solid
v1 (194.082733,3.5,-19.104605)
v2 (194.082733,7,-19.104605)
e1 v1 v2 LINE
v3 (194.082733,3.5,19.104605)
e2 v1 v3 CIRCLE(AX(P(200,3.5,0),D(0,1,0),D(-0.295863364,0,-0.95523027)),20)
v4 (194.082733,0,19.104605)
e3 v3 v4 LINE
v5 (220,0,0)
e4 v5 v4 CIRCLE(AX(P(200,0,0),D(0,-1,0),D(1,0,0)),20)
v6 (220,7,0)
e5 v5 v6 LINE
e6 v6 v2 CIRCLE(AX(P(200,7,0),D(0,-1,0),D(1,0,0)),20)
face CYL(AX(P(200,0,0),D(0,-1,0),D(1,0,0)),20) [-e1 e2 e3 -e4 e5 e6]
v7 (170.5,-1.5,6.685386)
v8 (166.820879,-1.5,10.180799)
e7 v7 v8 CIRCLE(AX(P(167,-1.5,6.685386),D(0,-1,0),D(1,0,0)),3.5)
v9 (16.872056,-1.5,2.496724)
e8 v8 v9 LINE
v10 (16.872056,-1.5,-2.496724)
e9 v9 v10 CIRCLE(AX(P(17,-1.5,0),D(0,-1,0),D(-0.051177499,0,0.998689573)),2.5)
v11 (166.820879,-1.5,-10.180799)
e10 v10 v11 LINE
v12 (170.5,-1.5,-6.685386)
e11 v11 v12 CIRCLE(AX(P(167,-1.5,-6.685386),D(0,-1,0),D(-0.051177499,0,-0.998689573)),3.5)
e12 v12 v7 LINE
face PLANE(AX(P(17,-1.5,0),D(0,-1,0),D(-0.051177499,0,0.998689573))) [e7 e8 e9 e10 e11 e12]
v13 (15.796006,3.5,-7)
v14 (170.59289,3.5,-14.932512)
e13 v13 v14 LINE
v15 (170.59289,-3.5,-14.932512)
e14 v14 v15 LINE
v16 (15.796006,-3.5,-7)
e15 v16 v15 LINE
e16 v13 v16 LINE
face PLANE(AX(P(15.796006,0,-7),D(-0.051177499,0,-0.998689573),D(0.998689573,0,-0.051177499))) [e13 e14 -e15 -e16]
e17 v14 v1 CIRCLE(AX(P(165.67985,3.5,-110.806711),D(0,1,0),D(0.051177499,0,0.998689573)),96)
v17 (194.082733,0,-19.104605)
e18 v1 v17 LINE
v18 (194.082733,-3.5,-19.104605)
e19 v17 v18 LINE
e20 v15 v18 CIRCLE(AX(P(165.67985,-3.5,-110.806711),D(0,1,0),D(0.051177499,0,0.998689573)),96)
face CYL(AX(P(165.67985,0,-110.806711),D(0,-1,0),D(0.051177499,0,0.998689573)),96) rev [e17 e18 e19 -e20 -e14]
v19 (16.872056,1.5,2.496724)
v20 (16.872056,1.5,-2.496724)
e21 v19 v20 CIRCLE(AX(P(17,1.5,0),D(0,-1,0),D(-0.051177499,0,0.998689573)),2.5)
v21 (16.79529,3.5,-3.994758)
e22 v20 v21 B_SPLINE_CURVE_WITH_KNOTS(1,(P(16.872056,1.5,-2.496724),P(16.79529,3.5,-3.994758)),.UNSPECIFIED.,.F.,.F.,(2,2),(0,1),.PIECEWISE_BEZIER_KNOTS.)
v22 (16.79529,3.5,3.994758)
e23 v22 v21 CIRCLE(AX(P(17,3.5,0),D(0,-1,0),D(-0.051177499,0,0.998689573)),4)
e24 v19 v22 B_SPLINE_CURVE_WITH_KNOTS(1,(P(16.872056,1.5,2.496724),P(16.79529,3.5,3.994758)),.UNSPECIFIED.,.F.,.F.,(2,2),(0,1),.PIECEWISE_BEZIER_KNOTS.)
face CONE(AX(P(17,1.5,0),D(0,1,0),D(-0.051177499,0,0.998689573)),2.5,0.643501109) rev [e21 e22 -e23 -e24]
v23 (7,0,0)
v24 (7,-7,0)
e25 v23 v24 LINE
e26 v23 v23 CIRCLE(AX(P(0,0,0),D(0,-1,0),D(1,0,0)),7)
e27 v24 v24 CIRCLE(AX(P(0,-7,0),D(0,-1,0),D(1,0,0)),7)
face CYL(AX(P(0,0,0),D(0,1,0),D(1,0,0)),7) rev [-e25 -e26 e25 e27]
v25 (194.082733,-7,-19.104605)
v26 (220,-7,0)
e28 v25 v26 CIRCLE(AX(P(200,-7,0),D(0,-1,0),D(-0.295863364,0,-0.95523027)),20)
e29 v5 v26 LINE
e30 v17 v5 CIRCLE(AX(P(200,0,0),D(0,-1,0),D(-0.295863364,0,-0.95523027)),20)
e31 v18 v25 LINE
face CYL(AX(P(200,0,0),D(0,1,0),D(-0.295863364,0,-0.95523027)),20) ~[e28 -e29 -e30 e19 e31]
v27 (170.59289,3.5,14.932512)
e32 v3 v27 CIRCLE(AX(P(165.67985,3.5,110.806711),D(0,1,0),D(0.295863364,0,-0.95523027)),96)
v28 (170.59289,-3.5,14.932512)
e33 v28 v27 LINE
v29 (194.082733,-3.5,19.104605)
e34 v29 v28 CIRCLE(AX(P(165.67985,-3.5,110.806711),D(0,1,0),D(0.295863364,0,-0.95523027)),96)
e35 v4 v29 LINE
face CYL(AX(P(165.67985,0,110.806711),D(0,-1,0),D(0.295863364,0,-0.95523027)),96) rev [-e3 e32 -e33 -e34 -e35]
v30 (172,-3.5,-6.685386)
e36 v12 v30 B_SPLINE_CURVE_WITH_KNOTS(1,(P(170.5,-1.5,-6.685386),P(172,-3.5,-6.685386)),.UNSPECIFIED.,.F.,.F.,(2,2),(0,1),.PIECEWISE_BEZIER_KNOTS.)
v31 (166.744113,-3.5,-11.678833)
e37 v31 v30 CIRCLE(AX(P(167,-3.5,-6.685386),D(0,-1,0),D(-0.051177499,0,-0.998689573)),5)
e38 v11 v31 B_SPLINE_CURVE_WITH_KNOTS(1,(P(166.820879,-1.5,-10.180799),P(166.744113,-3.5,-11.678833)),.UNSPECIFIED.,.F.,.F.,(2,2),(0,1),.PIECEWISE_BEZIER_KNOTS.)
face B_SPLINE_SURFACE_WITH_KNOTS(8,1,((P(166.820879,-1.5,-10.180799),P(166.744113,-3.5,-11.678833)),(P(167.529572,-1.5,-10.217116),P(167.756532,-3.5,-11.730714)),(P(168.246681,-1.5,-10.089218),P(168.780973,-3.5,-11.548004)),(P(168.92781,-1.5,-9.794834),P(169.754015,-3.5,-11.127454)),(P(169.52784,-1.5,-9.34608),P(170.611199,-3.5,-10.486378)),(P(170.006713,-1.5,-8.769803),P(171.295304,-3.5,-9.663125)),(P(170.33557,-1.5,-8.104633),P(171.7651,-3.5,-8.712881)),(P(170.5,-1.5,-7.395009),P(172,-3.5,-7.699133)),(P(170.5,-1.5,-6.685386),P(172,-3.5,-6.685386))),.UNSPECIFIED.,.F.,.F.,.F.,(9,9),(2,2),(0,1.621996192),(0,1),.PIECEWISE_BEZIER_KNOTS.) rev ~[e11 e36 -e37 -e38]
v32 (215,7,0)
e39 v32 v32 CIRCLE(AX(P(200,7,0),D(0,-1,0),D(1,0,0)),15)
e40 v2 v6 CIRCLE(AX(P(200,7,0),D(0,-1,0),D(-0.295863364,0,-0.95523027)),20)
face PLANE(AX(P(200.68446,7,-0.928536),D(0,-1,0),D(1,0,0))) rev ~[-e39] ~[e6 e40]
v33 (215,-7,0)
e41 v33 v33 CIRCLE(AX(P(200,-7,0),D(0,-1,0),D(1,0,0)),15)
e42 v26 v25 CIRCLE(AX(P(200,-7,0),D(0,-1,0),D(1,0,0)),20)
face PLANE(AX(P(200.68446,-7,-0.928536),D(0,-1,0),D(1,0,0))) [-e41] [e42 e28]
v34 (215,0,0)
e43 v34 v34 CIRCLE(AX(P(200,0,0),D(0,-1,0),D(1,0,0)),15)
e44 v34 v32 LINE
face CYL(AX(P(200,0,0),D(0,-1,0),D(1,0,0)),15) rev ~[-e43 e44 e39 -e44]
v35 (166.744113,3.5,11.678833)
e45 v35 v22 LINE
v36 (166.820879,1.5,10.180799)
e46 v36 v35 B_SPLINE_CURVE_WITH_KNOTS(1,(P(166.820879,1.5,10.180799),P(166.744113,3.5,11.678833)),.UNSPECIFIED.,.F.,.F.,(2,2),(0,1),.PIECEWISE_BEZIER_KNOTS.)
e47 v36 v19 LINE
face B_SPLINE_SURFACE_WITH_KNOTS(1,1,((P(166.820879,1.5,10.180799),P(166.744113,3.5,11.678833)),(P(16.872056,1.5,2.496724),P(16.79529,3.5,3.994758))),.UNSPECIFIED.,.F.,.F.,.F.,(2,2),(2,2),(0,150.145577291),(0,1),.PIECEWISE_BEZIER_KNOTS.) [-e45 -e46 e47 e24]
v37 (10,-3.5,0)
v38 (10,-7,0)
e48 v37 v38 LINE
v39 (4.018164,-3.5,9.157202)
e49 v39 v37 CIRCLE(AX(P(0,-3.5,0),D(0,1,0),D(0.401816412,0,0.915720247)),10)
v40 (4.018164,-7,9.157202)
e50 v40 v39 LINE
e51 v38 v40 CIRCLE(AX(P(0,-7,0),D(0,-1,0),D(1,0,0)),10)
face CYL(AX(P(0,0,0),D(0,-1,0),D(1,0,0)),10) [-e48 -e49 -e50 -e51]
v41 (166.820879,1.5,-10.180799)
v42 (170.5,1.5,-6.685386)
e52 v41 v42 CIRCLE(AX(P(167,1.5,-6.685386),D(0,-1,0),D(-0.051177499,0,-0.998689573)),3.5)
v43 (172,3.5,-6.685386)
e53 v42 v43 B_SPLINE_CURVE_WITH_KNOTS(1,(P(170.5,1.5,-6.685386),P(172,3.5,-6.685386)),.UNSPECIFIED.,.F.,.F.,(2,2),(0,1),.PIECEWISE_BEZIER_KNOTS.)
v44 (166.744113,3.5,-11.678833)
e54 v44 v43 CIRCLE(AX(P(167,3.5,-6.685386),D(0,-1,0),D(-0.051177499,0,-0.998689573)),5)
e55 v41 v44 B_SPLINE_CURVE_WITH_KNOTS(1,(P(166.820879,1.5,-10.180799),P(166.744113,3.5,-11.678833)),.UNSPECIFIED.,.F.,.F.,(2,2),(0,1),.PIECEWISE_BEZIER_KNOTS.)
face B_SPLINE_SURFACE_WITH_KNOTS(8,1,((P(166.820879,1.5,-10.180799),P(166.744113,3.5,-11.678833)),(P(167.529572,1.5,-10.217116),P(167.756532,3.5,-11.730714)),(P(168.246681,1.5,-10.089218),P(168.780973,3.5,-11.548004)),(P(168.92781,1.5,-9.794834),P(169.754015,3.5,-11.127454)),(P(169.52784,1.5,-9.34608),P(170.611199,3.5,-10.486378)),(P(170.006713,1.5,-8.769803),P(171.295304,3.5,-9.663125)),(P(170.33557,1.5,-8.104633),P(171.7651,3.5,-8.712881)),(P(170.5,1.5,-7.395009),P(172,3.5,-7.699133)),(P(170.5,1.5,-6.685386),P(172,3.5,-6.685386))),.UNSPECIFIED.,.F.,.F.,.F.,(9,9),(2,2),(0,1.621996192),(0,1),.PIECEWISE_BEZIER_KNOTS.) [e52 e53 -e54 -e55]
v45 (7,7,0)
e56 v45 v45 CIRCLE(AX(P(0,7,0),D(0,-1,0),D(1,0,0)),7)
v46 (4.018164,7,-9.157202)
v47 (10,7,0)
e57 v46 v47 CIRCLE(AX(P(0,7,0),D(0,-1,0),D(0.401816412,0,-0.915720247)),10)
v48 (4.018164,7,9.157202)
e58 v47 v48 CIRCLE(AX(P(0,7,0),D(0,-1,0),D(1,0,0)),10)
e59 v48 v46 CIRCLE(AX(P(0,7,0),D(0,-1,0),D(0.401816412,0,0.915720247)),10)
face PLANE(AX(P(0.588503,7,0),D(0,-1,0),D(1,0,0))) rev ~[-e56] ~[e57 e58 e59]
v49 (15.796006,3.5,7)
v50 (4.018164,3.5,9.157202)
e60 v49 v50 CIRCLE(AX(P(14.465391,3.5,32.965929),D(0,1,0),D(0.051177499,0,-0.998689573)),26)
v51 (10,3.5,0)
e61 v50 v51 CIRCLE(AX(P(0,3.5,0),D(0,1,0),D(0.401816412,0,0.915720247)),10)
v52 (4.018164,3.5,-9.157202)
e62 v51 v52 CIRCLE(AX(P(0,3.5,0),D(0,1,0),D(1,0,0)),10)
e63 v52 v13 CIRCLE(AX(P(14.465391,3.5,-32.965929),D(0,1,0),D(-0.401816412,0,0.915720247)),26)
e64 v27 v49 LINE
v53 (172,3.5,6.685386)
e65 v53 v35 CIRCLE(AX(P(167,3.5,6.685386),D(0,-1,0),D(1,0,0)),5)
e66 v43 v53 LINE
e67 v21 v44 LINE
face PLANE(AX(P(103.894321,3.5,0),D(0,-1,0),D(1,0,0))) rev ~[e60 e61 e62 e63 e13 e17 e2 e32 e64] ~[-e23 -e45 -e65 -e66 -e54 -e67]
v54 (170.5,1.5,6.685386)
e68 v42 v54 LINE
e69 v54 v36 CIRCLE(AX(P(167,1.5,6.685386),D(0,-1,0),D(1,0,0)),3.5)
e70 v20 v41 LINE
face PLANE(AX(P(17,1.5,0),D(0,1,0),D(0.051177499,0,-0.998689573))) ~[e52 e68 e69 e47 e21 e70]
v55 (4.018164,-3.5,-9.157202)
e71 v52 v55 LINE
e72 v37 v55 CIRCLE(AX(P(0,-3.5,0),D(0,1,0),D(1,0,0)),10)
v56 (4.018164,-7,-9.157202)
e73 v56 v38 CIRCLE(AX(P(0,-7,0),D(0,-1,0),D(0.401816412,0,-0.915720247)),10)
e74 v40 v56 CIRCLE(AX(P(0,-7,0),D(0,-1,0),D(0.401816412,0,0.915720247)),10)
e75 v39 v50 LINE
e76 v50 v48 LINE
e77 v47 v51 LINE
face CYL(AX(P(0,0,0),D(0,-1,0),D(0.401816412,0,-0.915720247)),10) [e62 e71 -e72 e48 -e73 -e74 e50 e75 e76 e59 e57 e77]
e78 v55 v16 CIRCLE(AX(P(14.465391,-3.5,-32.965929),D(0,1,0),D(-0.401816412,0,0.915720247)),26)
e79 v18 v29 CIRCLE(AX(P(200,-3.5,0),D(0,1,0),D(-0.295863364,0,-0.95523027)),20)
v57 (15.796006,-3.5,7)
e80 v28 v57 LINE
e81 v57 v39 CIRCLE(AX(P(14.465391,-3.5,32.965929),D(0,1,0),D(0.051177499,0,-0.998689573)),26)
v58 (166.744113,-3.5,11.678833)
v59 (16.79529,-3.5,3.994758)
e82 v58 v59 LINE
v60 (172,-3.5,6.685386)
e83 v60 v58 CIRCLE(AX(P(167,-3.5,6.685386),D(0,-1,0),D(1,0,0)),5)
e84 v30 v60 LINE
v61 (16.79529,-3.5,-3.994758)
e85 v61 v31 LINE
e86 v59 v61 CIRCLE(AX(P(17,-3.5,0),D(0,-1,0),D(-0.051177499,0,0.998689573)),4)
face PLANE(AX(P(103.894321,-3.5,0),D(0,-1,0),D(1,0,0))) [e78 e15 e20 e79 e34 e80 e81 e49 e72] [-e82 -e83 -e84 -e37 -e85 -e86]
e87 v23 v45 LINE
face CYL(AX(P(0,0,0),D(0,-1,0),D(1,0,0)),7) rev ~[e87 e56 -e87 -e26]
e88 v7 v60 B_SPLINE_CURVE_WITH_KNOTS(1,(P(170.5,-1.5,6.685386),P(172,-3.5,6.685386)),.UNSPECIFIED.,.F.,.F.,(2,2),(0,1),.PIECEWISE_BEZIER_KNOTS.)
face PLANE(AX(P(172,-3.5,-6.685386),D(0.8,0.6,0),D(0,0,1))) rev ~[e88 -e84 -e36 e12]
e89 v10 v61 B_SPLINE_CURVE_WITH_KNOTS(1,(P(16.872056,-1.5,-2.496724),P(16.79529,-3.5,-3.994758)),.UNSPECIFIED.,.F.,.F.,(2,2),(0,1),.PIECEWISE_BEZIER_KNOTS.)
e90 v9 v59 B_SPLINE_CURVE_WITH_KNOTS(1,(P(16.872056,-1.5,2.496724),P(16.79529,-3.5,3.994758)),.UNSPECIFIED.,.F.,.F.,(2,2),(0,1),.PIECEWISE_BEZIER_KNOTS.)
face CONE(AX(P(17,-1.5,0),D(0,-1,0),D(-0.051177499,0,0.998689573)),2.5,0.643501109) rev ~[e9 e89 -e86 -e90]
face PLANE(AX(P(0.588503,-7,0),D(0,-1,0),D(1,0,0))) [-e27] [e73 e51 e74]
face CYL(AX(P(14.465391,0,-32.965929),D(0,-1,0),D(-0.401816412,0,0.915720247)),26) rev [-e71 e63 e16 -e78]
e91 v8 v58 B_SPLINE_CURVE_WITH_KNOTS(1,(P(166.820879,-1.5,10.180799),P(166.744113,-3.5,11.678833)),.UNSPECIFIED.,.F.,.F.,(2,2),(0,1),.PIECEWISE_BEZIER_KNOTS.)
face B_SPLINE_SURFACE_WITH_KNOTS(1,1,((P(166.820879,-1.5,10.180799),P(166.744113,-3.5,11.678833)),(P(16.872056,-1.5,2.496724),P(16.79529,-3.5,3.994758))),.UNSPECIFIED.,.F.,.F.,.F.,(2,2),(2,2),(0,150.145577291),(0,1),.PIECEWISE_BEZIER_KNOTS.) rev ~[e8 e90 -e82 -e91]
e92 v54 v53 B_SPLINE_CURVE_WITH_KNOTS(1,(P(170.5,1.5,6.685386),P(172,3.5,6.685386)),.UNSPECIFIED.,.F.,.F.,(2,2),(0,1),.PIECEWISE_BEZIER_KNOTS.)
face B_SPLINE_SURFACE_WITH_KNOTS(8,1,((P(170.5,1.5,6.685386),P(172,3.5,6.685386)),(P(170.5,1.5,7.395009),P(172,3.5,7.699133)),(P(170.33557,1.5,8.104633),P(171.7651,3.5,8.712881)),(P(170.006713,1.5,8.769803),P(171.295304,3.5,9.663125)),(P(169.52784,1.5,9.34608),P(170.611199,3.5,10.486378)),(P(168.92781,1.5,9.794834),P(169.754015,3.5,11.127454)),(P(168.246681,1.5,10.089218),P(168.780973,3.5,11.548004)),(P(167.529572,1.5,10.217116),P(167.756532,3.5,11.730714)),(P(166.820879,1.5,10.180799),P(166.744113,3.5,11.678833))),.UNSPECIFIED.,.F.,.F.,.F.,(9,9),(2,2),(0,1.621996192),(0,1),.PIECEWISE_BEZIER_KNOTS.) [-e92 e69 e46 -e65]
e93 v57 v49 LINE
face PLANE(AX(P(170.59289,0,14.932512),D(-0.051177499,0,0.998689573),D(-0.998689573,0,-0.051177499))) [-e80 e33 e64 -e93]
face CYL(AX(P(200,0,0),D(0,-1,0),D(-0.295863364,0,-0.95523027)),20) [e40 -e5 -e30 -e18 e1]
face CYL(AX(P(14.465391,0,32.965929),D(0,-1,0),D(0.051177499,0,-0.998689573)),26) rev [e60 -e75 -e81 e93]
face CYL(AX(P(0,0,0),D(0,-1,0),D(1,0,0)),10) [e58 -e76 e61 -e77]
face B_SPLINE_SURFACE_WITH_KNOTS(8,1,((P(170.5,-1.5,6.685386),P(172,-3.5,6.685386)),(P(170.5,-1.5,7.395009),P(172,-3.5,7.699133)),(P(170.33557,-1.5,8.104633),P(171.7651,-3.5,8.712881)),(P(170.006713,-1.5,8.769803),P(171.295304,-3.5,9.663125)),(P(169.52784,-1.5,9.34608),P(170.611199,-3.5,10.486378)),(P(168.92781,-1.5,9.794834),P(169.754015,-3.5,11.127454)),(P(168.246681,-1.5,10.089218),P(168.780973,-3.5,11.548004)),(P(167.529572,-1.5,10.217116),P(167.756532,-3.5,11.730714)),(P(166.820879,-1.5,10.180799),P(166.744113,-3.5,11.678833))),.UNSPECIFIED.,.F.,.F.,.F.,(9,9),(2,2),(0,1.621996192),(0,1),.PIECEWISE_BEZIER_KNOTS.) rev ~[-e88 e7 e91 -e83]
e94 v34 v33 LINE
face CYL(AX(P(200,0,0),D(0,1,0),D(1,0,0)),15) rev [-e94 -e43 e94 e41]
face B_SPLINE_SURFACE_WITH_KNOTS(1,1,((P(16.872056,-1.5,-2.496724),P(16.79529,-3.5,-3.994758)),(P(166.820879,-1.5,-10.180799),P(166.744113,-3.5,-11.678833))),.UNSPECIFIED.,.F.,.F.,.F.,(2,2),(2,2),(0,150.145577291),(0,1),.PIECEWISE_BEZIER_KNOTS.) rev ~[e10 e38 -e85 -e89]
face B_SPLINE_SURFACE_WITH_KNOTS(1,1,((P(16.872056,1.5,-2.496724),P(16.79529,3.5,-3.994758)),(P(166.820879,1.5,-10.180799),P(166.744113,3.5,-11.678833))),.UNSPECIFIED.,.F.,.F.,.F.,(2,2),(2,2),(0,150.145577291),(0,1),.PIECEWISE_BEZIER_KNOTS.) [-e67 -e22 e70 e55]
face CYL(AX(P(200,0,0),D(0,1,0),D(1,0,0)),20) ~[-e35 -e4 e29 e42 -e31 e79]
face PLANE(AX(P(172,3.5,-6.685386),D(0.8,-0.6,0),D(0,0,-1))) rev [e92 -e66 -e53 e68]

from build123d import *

# Parameters (mm, degrees)
F2_DEPTH = 3.5
F0_R     = 15
F0_R_2   = 7
F3_DEPTH = 7


# Not quite as in the source:
# - a pattern or mirror of a feature is missing from the dataset's text; its kind, count and spacing are read off the source's solid


with BuildPart() as f2:
    # F0 (on Front) → F2 (new body, symmetric)
    with BuildSketch(Plane.XZ):
        with BuildLine():
            ThreePointArc((4.0181641166, 9.157202473), (8.372026074, 5.4689285438), (10, 0))
            ThreePointArc((10, 0), (8.372026074, -5.4689285438), (4.0181641166, -9.157202473))
            ThreePointArc((4.0181641166, -9.157202473), (9.7812118117, -7.3913621026), (15.7960057944, -7))
            Line((15.7960057944, -7), (170.5928896385, -14.9325123484))
            ThreePointArc((170.5928896385, -14.9325123484), (182.467918995, -16.2860219438), (194.0827327125, -19.1046054094))
            ThreePointArc((194.0827327125, -19.1046054094), (180, 0), (194.0827327125, 19.1046054094))
            ThreePointArc((194.0827327125, 19.1046054094), (182.467918995, 16.2860219438), (170.5928896385, 14.9325123484))
            Line((170.5928896385, 14.9325123484), (15.7960057944, 7))
            ThreePointArc((15.7960057944, 7), (9.7812118117, 7.3913621026), (4.0181641166, 9.157202473))
        make_face()
    extrude(amount=F2_DEPTH, both=True)

    # F0 (on Front) → F3 (join, symmetric)
    with BuildSketch(Plane.XZ):
        with BuildLine():
            ThreePointArc((220, 0), (211.86706902, 16.0988407308), (194.0827327125, 19.1046054094))
            ThreePointArc((194.0827327125, 19.1046054094), (180, 0), (194.0827327125, -19.1046054094))
            ThreePointArc((194.0827327125, -19.1046054094), (211.86706902, -16.0988407308), (220, 0))
        make_face()
        with Locations((200, 0)):
            Circle(F0_R, mode=Mode.SUBTRACT)
        with BuildLine():
            ThreePointArc((4.0181641166, -9.157202473), (8.372026074, -5.4689285438), (10, 0))
            ThreePointArc((10, 0), (8.372026074, 5.4689285438), (4.0181641166, 9.157202473))
            ThreePointArc((4.0181641166, 9.157202473), (-10, 0), (4.0181641166, -9.157202473))
        make_face()
        Circle(F0_R_2, mode=Mode.SUBTRACT)
    extrude(amount=F3_DEPTH, both=True)

    # F5 (on offset) → F6 section 0
    with BuildSketch(Plane.XZ.offset(1.5)):
        with BuildLine():
            Line((166.8208787534, 10.1807990679), (16.8720562524, 2.496723933))
            ThreePointArc((16.8720562524, 2.496723933), (14.5, 0), (16.8720562524, -2.496723933))
            Line((16.8720562524, -2.496723933), (166.8208787534, -10.1807990679))
            ThreePointArc((166.8208787534, -10.1807990679), (169.4107131348, -9.2227980591), (170.5, -6.6853855618))
            Line((170.5, -6.6853855618), (170.5, 6.6853855618))
            ThreePointArc((170.5, 6.6853855618), (169.4107131348, 9.2227980591), (166.8208787534, 10.1807990679))
        make_face()
    # F4 (on face) → F6 section 1
    with BuildSketch(Plane.XZ.offset(3.5)):
        with BuildLine():
            Line((166.7441125049, 11.6788334277), (16.7952900039, 3.9947582928))
            ThreePointArc((16.7952900039, 3.9947582928), (13, 0), (16.7952900039, -3.9947582928))
            Line((16.7952900039, -3.9947582928), (166.7441125049, -11.6788334277))
            ThreePointArc((166.7441125049, -11.6788334277), (170.4438759069, -10.3102605579), (172, -6.6853855618))
            Line((172, -6.6853855618), (172, 6.6853855618))
            ThreePointArc((172, 6.6853855618), (170.4438759069, 10.3102605579), (166.7441125049, 11.6788334277))
        make_face()
    f6 = loft(mode=Mode.SUBTRACT)

    # F6_copies: F6 across plane
    add(f6.mirror(Plane.ZX), mode=Mode.SUBTRACT)


solid = f2.part
